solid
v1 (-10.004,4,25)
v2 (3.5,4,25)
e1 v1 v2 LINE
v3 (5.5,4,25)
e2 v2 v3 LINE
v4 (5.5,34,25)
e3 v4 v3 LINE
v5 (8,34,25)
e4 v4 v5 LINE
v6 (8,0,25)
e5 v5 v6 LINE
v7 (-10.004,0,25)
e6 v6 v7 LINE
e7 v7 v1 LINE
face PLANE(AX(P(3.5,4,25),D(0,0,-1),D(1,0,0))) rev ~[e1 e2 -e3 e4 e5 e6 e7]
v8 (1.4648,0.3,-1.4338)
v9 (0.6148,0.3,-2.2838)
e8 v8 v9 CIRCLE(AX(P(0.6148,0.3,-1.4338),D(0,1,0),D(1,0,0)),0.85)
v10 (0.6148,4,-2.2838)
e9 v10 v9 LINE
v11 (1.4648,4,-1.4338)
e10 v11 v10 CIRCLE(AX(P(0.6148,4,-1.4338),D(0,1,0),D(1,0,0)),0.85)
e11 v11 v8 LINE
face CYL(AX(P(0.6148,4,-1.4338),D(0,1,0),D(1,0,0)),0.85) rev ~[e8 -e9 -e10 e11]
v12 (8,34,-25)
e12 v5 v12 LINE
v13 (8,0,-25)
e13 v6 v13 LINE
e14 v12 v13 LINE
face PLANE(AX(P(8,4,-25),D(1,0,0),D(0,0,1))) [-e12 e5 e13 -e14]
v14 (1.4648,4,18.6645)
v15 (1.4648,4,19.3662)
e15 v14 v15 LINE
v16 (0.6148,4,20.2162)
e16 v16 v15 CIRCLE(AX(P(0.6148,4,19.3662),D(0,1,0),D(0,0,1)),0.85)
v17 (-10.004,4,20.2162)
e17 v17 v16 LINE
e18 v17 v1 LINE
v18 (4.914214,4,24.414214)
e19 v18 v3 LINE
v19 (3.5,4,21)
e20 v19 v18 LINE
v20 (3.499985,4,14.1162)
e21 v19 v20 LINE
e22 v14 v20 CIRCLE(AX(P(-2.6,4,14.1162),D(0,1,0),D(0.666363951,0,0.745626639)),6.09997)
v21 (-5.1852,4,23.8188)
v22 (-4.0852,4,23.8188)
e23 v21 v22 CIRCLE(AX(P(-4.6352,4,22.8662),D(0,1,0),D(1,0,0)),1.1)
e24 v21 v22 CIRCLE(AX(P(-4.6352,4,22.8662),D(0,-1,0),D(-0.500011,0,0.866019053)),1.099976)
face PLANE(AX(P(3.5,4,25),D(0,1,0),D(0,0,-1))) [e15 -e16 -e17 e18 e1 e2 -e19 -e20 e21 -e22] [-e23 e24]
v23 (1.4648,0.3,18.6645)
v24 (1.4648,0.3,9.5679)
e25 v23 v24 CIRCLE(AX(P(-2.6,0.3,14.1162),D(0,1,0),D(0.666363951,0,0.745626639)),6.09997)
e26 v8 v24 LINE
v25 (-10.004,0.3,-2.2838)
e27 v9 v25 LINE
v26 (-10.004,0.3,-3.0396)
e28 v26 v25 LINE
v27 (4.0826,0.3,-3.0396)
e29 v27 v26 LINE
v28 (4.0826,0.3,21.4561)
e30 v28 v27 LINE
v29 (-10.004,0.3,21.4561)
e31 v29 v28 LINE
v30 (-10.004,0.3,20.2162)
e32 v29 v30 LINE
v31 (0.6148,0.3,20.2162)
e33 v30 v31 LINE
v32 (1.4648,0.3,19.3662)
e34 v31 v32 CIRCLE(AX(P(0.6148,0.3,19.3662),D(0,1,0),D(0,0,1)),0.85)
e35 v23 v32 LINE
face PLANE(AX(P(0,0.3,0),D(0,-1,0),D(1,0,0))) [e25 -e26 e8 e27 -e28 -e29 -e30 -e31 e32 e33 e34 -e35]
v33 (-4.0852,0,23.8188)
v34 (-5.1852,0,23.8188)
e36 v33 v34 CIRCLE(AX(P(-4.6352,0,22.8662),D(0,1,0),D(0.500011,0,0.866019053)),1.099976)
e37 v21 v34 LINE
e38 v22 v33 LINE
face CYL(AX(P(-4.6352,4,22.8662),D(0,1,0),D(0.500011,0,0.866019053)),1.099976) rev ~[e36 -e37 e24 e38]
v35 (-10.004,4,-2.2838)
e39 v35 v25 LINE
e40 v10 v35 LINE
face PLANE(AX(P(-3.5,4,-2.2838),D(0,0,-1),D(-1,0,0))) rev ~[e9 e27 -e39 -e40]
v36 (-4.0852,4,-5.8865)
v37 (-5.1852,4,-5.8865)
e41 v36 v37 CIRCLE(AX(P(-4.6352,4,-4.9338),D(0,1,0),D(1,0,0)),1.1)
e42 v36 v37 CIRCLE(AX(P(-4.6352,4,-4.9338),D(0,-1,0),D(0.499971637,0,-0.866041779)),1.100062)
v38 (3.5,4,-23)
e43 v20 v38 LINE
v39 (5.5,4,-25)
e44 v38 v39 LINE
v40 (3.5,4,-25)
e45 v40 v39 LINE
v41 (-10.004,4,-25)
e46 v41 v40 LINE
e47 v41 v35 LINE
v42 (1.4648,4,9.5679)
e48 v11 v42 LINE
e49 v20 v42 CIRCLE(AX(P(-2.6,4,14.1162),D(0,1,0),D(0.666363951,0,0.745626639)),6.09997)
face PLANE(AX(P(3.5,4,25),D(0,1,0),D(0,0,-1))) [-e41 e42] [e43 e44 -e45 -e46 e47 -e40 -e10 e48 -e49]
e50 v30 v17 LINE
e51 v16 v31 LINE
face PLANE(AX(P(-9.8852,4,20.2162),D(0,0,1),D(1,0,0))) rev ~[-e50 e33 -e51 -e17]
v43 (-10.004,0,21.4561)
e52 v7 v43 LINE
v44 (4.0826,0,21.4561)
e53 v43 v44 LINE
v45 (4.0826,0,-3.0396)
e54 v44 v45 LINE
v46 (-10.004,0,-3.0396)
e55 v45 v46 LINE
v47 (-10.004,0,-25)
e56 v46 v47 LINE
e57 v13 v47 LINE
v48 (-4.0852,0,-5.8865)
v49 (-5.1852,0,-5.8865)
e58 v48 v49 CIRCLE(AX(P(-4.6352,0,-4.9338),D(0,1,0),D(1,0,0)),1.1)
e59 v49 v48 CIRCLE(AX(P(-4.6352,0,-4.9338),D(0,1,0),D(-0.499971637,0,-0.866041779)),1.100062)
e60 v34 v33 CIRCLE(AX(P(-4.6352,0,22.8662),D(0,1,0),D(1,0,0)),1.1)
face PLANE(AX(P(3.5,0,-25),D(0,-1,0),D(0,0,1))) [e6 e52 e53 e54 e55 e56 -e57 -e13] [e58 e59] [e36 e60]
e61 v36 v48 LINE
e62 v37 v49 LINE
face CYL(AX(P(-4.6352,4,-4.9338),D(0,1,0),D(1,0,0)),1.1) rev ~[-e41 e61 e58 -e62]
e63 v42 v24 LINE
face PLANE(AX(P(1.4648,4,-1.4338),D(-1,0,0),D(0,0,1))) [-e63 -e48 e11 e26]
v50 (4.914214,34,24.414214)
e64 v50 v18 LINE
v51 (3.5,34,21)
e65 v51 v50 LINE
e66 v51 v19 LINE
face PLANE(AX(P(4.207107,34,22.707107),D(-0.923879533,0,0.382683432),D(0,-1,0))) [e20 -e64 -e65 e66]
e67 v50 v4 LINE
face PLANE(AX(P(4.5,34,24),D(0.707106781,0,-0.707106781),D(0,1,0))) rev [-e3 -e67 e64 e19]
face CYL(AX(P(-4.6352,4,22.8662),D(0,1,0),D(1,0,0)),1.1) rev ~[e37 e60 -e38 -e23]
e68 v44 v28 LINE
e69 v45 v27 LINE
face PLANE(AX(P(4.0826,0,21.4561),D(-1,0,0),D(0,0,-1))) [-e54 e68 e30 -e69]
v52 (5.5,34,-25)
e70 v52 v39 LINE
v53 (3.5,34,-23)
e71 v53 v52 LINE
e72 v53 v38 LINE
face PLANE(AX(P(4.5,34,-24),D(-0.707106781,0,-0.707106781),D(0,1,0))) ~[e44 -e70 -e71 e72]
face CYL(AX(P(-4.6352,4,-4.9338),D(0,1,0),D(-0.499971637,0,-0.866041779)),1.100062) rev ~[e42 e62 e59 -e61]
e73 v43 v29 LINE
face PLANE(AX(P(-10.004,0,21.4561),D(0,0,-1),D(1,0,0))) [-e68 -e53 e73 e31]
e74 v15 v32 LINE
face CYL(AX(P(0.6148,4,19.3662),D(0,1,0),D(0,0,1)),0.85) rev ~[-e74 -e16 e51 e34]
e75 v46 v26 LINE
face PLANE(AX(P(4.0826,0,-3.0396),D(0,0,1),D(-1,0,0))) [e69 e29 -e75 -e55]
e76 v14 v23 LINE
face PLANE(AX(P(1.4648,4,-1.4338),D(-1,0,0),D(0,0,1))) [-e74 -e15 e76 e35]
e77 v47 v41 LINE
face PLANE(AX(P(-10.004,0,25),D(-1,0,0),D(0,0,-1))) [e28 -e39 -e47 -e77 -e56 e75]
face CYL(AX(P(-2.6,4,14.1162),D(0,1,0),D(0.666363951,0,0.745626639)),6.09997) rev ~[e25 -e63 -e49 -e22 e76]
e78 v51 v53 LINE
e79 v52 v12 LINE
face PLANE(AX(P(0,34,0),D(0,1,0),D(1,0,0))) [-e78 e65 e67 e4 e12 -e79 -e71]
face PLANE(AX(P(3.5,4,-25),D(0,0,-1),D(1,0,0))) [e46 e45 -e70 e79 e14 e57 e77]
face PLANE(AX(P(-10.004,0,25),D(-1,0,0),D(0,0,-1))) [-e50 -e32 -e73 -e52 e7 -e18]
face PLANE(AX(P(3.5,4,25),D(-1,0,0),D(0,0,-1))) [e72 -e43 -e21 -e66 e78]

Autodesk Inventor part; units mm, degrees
ref_plane "YZ Plane" through (0, 0, 0) normal (1, 0, 0) x (0, 1, 0)
ref_plane "XZ Plane" through (0, 0, 0) normal (0, 1, 0) x (-1, 0, 0)
ref_plane "XY Plane" through (0, 0, 0) normal (0, 0, 1) x (1, 0, 0)
sketch "Эскиз1" plane through (0, 0, 0) normal (0, 1, 0) x (-1, 0, 0)
  line L0 (0, 0) -> (0, -20)
  circle A0 centre (0, -20) radius 2
  line L1 (-3.5, 25) -> (3.5, 25)
  line L2 (3.5, 25) -> (3.5, -25)
  line L3 (3.5, -25) -> (-3.5, -25)
  line L4 (-3.5, -25) -> (-3.5, 25)
  line L5 (-3.5, 25) -> (3.5, -25) construction
  line L6 (3.5, 25) -> (-3.5, -25) construction
  line L7 (0, 0) -> (0, 20)
  circle A1 centre (0, 20) radius 2
  dimension "d0" = 20
  dimension "d1" = 4
  dimension "d2" = 7
  dimension "d3" = 50
  dimension "d4" = 20
  dimension "d5" = 4
extrude "Выдавливание1" add sketch "Эскиз1" along normal blind 4 contours A0 | L1 L2 L3 L4 | A1
sketch "Эскиз2" plane through (3.5, 0, 25) normal (1, 0, 0) x (0, 0, -1)
  line L0 (50, 0) -> (0, 0) projected
  line L1 (0, 4) -> (50, 4)
  line L2 (50, 4) -> (50, 0)
  line L3 (50, 0) -> (0, 0)
  line L4 (0, 0) -> (0, 4)
  point P0 (25, 0)
extrude "Выдавливание2" add sketch "Эскиз2" along normal blind 7
sketch "Эскиз3" plane through (0, 4, 0) normal (0, 1, 0) x (1, 0, 0)
  line L0 (-3.5, -25) -> (10.5, -25) projected
  line L1 (-3.5, 25) -> (10.5, 25) projected
  line L2 (10.5, -25) -> (3.5, -25)
  line L3 (3.5, -25) -> (3.5, 25)
  line L4 (3.5, 25) -> (10.5, 25)
  line L5 (10.5, 25) -> (10.5, -25)
  point P0 (0, 0)
  dimension "d10" = 7
extrude "Выдавливание3" add sketch "Эскиз3" along normal blind 30
sketch "Эскиз5" plane through (0, 4, 0) normal (0, 1, 0) x (1, 0, 0)
  line L0 (-7.5352, -8.6362) -> (-7.5352, -8.5162)
  arc A0 (-1.7352, -8.5162) -> (-7.5352, -8.5162) centre (-4.6352, -8.5162) ccw
  line L1 (-1.7352, -8.5162) -> (-1.7352, -8.6362)
  arc A1 (1.3648, -12.5541) -> (-1.7352, -8.6362) centre (-4.6352, -14.1162) ccw
  line L2 (1.3648, -12.5541) -> (1.3648, 1.4338)
  arc A2 (1.3648, 1.4338) -> (0.6148, 2.1838) centre (0.6148, 1.4338) ccw
  line L3 (0.6148, 2.1838) -> (-9.8852, 2.1838)
  arc A3 (-9.8852, 2.1838) -> (-10.6352, 1.4338) centre (-9.8852, 1.4338) ccw
  line L4 (-10.6352, 1.4338) -> (-10.6352, -12.5541)
  arc A4 (-7.5352, -8.6362) -> (-10.6352, -12.5541) centre (-4.6352, -14.1162) ccw
  line L5 (0.4648, -4.2162) -> (0.4648, 0.7838)
  arc A5 (-0.0352, -4.7162) -> (0.4648, -4.2162) centre (-0.0352, -4.2162) ccw
  line L6 (-9.2352, -4.7162) -> (-0.0352, -4.7162)
  arc A6 (-9.7352, -4.2162) -> (-9.2352, -4.7162) centre (-9.2352, -4.2162) ccw
  line L7 (-9.7352, 0.7838) -> (-9.7352, -4.2162)
  arc A7 (-9.2352, 1.2838) -> (-9.7352, 0.7838) centre (-9.2352, 0.7838) ccw
  line L8 (-0.0352, 1.2838) -> (-9.2352, 1.2838)
  arc A8 (0.4648, 0.7838) -> (-0.0352, 1.2838) centre (-0.0352, 0.7838) ccw
  arc A9 (-5.1852, 5.8865) -> (-4.0852, 5.8865) centre (-4.6352, 4.9338) ccw
  line L9 (-5.1852, 7.0838) -> (-5.1852, 5.8865)
  line L10 (-5.1852, 7.0838) -> (-9.8852, 7.0838)
  arc A10 (-9.8852, 7.0838) -> (-10.7352, 6.2338) centre (-9.8852, 6.2338) ccw
  line L11 (-10.7352, 6.2338) -> (-10.7352, 1.4338)
  arc A11 (-9.8852, 2.2838) -> (-10.7352, 1.4338) centre (-9.8852, 1.4338) ccw
  line L12 (0.6148, 2.2838) -> (-9.8852, 2.2838)
  arc A12 (1.4648, 1.4338) -> (0.6148, 2.2838) centre (0.6148, 1.4338) ccw
  line L13 (1.4648, 1.4338) -> (1.4648, 6.2338)
  arc A13 (1.4648, 6.2338) -> (0.6148, 7.0838) centre (0.6148, 6.2338) ccw
  line L14 (0.6148, 7.0838) -> (-4.0852, 7.0838)
  line L15 (-4.0852, 5.8865) -> (-4.0852, 7.0838)
  line L16 (-9.8852, -25.0162) -> (-5.1852, -25.0162)
  line L17 (-5.1852, -23.8188) -> (-5.1852, -25.0162)
  arc A14 (-4.0852, -23.8188) -> (-5.1852, -23.8188) centre (-4.6352, -22.8662) ccw
  line L18 (-4.0852, -25.0162) -> (-4.0852, -23.8188)
  line L19 (-4.0852, -25.0162) -> (0.6148, -25.0162)
  arc A15 (0.6148, -25.0162) -> (1.4648, -24.1662) centre (0.6148, -24.1662) ccw
  line L20 (1.4648, -24.1662) -> (1.4648, -19.3662)
  arc A16 (0.6148, -20.2162) -> (1.4648, -19.3662) centre (0.6148, -19.3662) ccw
  line L21 (-9.8852, -20.2162) -> (0.6148, -20.2162)
  arc A17 (-10.7352, -19.3662) -> (-9.8852, -20.2162) centre (-9.8852, -19.3662) ccw
  line L22 (-10.7352, -19.3662) -> (-10.7352, -24.1662)
  arc A18 (-10.7352, -24.1662) -> (-9.8852, -25.0162) centre (-9.8852, -24.1662) ccw
  line L23 (-10.7352, -19.3662) -> (-10.7352, -15.6782)
  line L24 (-10.7352, -12.5541) -> (-10.7352, -14.1162)
  line L25 (-10.7352, -14.1162) -> (-10.7352, -15.6782)
  line L26 (-10.7352, -12.5541) -> (-10.7352, 1.4338)
  line L27 (1.4648, 1.4338) -> (1.4648, -12.5541)
  line L28 (1.4648, -15.6782) -> (1.4648, -19.3662)
  line L29 (1.4648, -15.6782) -> (1.4648, -14.1162)
  line L30 (1.4648, -14.1162) -> (1.4648, -12.5541)
  arc A19 (-10.6352, -15.6782) -> (-6.1972, -20.1162) centre (-4.6352, -14.1162) ccw
  line L31 (-10.6352, -15.6782) -> (-10.6352, -19.3662)
  arc A20 (-10.6352, -19.3662) -> (-9.8852, -20.1162) centre (-9.8852, -19.3662) ccw
  line L32 (-9.8852, -20.1162) -> (-6.1972, -20.1162)
  line L33 (1.3648, -19.3662) -> (1.3648, -15.6782)
  arc A21 (-3.0731, -20.1162) -> (1.3648, -15.6782) centre (-4.6352, -14.1162) ccw
  line L34 (-3.0731, -20.1162) -> (0.6148, -20.1162)
  arc A22 (0.6148, -20.1162) -> (1.3648, -19.3662) centre (0.6148, -19.3662) ccw
  circle A23 centre (-4.6352, 4.9338) radius 1.1
  line L35 (-5.1852, 5.8865) -> (-5.1852, 7.0838)
  line L36 (-4.0852, 7.0838) -> (-5.1852, 7.0838)
  circle A24 centre (-4.6352, -22.8662) radius 1.1
  line L37 (-5.1852, -25.0162) -> (-5.1852, -23.8188)
  line L38 (-4.0852, -25.0162) -> (-5.1852, -25.0162)
  circle A25 centre (-4.6352, -14.1162) radius 0.8
  line L39 (-3.5, 25) -> (3.5, 25) projected
  line L40 (-13.5, 25) -> (-13.5, -25)
  line L41 (-13.5, -25) -> (-3.5, -25)
  line L42 (-3.5, -25) -> (-3.5, 25)
  point P0 (0, 0)
  point P1 (-4.6352, -8.9662)
  dimension "d16" = 10
extrude "Выдавливание5" cut sketch "Эскиз5" against normal blind 10 contours A4 L4 A3 L3 L42 L8 A7 L7 A6 L6 A0 L0 | L0 A0 L42 L21 A17 L23 L25 L24 L26 A11 L12 L3 A3 L4 A4 | L42 L6 A5 L5 A8 L8 L3 A2 L2 A1 L1 A0 | A0 L1 A1 L2 A2 L3 L42 L12 A12 L27 L30 L29 L28 A16 L21 | L42 L8 A8 L5 A5 L6 | L6 A6 L7 A7 L8 L42 | A19 L32 A20 L31 | A22 L34 A21 L33 | A25
move faces "Перенос1" translate (-6.504, 0, 0) faces at (-3.5, 2.6667, -9.8559) (-3.5, 1.3333, 23.4054)
sketch "Эскиз6" plane through (0, 4, 0) normal (0, 1, 0) x (1, 0, 0)
  arc A0 (1.4648, -18.6645) -> (1.4648, -9.5679) centre (-2.6, -14.1162) ccw
  line L0 (1.4648, -9.5679) -> (1.4648, -19.3662)
  point P0 (0, 0)
  point P1 (0.2532, -8.7246)
  point P2 (-5.4532, -8.7246)
extrude "Выдавливание6" cut sketch "Эскиз6" against normal blind 7
sketch "Эскиз7" plane through (0, 0, 0) normal (0, -1, 0) x (1, 0, 0)
  line L0 (-10.004, 25) -> (-10.004, 20.2162) projected
  line L1 (-10.004, 21.4561) -> (4.0826, 21.4561)
  line L2 (4.0826, 21.4561) -> (4.0826, -3.0396)
  line L3 (4.0826, -3.0396) -> (-10.004, -3.0396)
  line L4 (-10.004, -3.0396) -> (-10.004, 21.4561)
  point P0 (0, 0)
extrude "Выдавливание7" cut sketch "Эскиз7" against normal blind 0.3
sketch "Эскиз8" plane through (0, 4, 0) normal (0, 1, 0) x (1, 0, 0)
  line L0 (-7.5352, -8.6362) -> (-7.5352, -8.5162)
  arc A0 (-1.7352, -8.5162) -> (-7.5352, -8.5162) centre (-4.6352, -8.5162) ccw
  line L1 (-1.7352, -8.5162) -> (-1.7352, -8.6362)
  arc A1 (1.3648, -12.5541) -> (-1.7352, -8.6362) centre (-4.6352, -14.1162) ccw
  line L2 (1.3648, -12.5541) -> (1.3648, 1.4338)
  arc A2 (1.3648, 1.4338) -> (0.6148, 2.1838) centre (0.6148, 1.4338) ccw
  line L3 (0.6148, 2.1838) -> (-9.8852, 2.1838)
  arc A3 (-9.8852, 2.1838) -> (-10.6352, 1.4338) centre (-9.8852, 1.4338) ccw
  line L4 (-10.6352, 1.4338) -> (-10.6352, -12.5541)
  arc A4 (-7.5352, -8.6362) -> (-10.6352, -12.5541) centre (-4.6352, -14.1162) ccw
  line L5 (0.4648, -4.2162) -> (0.4648, 0.7838)
  arc A5 (-0.0352, -4.7162) -> (0.4648, -4.2162) centre (-0.0352, -4.2162) ccw
  line L6 (-9.2352, -4.7162) -> (-0.0352, -4.7162)
  arc A6 (-9.7352, -4.2162) -> (-9.2352, -4.7162) centre (-9.2352, -4.2162) ccw
  line L7 (-9.7352, 0.7838) -> (-9.7352, -4.2162)
  arc A7 (-9.2352, 1.2838) -> (-9.7352, 0.7838) centre (-9.2352, 0.7838) ccw
  line L8 (-0.0352, 1.2838) -> (-9.2352, 1.2838)
  arc A8 (0.4648, 0.7838) -> (-0.0352, 1.2838) centre (-0.0352, 0.7838) ccw
  arc A9 (-5.1852, 5.8865) -> (-4.0852, 5.8865) centre (-4.6352, 4.9338) ccw
  line L9 (-5.1852, 7.0838) -> (-5.1852, 5.8865)
  line L10 (-5.1852, 7.0838) -> (-9.8852, 7.0838)
  arc A10 (-9.8852, 7.0838) -> (-10.7352, 6.2338) centre (-9.8852, 6.2338) ccw
  line L11 (-10.7352, 6.2338) -> (-10.7352, 1.4338)
  arc A11 (-9.8852, 2.2838) -> (-10.7352, 1.4338) centre (-9.8852, 1.4338) ccw
  line L12 (0.6148, 2.2838) -> (-9.8852, 2.2838)
  arc A12 (1.4648, 1.4338) -> (0.6148, 2.2838) centre (0.6148, 1.4338) ccw
  line L13 (1.4648, 1.4338) -> (1.4648, 6.2338)
  arc A13 (1.4648, 6.2338) -> (0.6148, 7.0838) centre (0.6148, 6.2338) ccw
  line L14 (0.6148, 7.0838) -> (-4.0852, 7.0838)
  line L15 (-4.0852, 5.8865) -> (-4.0852, 7.0838)
  line L16 (-9.8852, -25.0162) -> (-5.1852, -25.0162)
  line L17 (-5.1852, -23.8188) -> (-5.1852, -25.0162)
  arc A14 (-4.0852, -23.8188) -> (-5.1852, -23.8188) centre (-4.6352, -22.8662) ccw
  line L18 (-4.0852, -25.0162) -> (-4.0852, -23.8188)
  line L19 (-4.0852, -25.0162) -> (0.6148, -25.0162)
  arc A15 (0.6148, -25.0162) -> (1.4648, -24.1662) centre (0.6148, -24.1662) ccw
  line L20 (1.4648, -24.1662) -> (1.4648, -19.3662)
  arc A16 (0.6148, -20.2162) -> (1.4648, -19.3662) centre (0.6148, -19.3662) ccw
  line L21 (-9.8852, -20.2162) -> (0.6148, -20.2162)
  arc A17 (-10.7352, -19.3662) -> (-9.8852, -20.2162) centre (-9.8852, -19.3662) ccw
  line L22 (-10.7352, -19.3662) -> (-10.7352, -24.1662)
  arc A18 (-10.7352, -24.1662) -> (-9.8852, -25.0162) centre (-9.8852, -24.1662) ccw
  line L23 (-10.7352, -19.3662) -> (-10.7352, -15.6782)
  line L24 (-10.7352, -12.5541) -> (-10.7352, -14.1162)
  line L25 (-10.7352, -14.1162) -> (-10.7352, -15.6782)
  line L26 (-10.7352, -12.5541) -> (-10.7352, 1.4338)
  line L27 (1.4648, 1.4338) -> (1.4648, -12.5541)
  line L28 (1.4648, -15.6782) -> (1.4648, -19.3662)
  line L29 (1.4648, -15.6782) -> (1.4648, -14.1162)
  line L30 (1.4648, -14.1162) -> (1.4648, -12.5541)
  arc A19 (-10.6352, -15.6782) -> (-6.1972, -20.1162) centre (-4.6352, -14.1162) ccw
  line L31 (-10.6352, -15.6782) -> (-10.6352, -19.3662)
  arc A20 (-10.6352, -19.3662) -> (-9.8852, -20.1162) centre (-9.8852, -19.3662) ccw
  line L32 (-9.8852, -20.1162) -> (-6.1972, -20.1162)
  line L33 (1.3648, -19.3662) -> (1.3648, -15.6782)
  arc A21 (-3.0731, -20.1162) -> (1.3648, -15.6782) centre (-4.6352, -14.1162) ccw
  line L34 (-3.0731, -20.1162) -> (0.6148, -20.1162)
  arc A22 (0.6148, -20.1162) -> (1.3648, -19.3662) centre (0.6148, -19.3662) ccw
  circle A23 centre (-4.6352, 4.9338) radius 1.1
  line L35 (-5.1852, 5.8865) -> (-5.1852, 7.0838)
  line L36 (-4.0852, 7.0838) -> (-5.1852, 7.0838)
  circle A24 centre (-4.6352, -22.8662) radius 1.1
  line L37 (-5.1852, -25.0162) -> (-5.1852, -23.8188)
  line L38 (-4.0852, -25.0162) -> (-5.1852, -25.0162)
  circle A25 centre (-4.6352, -14.1162) radius 0.8
  line L39 (-3.5, 25) -> (3.5, 25)
  line L40 (-13.5, 25) -> (-13.5, -25)
  line L41 (-13.5, -25) -> (-3.5, -25)
  line L42 (-3.5, -25) -> (-3.5, 25)
  point P0 (0, 0)
  point P1 (0, 0)
  point P2 (-4.6352, -8.9662)
  dimension "d26" = 10
extrude "Выдавливание8" cut sketch "Эскиз8" against normal through all contours A24 A14 | A9 A23
move faces "Перенос2" translate (-2.5, 0, 0) faces at (10.5, 11.3333, -8.3333)
chamfer "Фаска1" distance 2 angle 45 2 edges at (3.5, 19, 25) (3.5, 19, -25)
chamfer "Фаска2" distance 2 angle 45 1 edges at (3.5, 19, 23)
properties part number "000.705 - Пассивный прижим"
